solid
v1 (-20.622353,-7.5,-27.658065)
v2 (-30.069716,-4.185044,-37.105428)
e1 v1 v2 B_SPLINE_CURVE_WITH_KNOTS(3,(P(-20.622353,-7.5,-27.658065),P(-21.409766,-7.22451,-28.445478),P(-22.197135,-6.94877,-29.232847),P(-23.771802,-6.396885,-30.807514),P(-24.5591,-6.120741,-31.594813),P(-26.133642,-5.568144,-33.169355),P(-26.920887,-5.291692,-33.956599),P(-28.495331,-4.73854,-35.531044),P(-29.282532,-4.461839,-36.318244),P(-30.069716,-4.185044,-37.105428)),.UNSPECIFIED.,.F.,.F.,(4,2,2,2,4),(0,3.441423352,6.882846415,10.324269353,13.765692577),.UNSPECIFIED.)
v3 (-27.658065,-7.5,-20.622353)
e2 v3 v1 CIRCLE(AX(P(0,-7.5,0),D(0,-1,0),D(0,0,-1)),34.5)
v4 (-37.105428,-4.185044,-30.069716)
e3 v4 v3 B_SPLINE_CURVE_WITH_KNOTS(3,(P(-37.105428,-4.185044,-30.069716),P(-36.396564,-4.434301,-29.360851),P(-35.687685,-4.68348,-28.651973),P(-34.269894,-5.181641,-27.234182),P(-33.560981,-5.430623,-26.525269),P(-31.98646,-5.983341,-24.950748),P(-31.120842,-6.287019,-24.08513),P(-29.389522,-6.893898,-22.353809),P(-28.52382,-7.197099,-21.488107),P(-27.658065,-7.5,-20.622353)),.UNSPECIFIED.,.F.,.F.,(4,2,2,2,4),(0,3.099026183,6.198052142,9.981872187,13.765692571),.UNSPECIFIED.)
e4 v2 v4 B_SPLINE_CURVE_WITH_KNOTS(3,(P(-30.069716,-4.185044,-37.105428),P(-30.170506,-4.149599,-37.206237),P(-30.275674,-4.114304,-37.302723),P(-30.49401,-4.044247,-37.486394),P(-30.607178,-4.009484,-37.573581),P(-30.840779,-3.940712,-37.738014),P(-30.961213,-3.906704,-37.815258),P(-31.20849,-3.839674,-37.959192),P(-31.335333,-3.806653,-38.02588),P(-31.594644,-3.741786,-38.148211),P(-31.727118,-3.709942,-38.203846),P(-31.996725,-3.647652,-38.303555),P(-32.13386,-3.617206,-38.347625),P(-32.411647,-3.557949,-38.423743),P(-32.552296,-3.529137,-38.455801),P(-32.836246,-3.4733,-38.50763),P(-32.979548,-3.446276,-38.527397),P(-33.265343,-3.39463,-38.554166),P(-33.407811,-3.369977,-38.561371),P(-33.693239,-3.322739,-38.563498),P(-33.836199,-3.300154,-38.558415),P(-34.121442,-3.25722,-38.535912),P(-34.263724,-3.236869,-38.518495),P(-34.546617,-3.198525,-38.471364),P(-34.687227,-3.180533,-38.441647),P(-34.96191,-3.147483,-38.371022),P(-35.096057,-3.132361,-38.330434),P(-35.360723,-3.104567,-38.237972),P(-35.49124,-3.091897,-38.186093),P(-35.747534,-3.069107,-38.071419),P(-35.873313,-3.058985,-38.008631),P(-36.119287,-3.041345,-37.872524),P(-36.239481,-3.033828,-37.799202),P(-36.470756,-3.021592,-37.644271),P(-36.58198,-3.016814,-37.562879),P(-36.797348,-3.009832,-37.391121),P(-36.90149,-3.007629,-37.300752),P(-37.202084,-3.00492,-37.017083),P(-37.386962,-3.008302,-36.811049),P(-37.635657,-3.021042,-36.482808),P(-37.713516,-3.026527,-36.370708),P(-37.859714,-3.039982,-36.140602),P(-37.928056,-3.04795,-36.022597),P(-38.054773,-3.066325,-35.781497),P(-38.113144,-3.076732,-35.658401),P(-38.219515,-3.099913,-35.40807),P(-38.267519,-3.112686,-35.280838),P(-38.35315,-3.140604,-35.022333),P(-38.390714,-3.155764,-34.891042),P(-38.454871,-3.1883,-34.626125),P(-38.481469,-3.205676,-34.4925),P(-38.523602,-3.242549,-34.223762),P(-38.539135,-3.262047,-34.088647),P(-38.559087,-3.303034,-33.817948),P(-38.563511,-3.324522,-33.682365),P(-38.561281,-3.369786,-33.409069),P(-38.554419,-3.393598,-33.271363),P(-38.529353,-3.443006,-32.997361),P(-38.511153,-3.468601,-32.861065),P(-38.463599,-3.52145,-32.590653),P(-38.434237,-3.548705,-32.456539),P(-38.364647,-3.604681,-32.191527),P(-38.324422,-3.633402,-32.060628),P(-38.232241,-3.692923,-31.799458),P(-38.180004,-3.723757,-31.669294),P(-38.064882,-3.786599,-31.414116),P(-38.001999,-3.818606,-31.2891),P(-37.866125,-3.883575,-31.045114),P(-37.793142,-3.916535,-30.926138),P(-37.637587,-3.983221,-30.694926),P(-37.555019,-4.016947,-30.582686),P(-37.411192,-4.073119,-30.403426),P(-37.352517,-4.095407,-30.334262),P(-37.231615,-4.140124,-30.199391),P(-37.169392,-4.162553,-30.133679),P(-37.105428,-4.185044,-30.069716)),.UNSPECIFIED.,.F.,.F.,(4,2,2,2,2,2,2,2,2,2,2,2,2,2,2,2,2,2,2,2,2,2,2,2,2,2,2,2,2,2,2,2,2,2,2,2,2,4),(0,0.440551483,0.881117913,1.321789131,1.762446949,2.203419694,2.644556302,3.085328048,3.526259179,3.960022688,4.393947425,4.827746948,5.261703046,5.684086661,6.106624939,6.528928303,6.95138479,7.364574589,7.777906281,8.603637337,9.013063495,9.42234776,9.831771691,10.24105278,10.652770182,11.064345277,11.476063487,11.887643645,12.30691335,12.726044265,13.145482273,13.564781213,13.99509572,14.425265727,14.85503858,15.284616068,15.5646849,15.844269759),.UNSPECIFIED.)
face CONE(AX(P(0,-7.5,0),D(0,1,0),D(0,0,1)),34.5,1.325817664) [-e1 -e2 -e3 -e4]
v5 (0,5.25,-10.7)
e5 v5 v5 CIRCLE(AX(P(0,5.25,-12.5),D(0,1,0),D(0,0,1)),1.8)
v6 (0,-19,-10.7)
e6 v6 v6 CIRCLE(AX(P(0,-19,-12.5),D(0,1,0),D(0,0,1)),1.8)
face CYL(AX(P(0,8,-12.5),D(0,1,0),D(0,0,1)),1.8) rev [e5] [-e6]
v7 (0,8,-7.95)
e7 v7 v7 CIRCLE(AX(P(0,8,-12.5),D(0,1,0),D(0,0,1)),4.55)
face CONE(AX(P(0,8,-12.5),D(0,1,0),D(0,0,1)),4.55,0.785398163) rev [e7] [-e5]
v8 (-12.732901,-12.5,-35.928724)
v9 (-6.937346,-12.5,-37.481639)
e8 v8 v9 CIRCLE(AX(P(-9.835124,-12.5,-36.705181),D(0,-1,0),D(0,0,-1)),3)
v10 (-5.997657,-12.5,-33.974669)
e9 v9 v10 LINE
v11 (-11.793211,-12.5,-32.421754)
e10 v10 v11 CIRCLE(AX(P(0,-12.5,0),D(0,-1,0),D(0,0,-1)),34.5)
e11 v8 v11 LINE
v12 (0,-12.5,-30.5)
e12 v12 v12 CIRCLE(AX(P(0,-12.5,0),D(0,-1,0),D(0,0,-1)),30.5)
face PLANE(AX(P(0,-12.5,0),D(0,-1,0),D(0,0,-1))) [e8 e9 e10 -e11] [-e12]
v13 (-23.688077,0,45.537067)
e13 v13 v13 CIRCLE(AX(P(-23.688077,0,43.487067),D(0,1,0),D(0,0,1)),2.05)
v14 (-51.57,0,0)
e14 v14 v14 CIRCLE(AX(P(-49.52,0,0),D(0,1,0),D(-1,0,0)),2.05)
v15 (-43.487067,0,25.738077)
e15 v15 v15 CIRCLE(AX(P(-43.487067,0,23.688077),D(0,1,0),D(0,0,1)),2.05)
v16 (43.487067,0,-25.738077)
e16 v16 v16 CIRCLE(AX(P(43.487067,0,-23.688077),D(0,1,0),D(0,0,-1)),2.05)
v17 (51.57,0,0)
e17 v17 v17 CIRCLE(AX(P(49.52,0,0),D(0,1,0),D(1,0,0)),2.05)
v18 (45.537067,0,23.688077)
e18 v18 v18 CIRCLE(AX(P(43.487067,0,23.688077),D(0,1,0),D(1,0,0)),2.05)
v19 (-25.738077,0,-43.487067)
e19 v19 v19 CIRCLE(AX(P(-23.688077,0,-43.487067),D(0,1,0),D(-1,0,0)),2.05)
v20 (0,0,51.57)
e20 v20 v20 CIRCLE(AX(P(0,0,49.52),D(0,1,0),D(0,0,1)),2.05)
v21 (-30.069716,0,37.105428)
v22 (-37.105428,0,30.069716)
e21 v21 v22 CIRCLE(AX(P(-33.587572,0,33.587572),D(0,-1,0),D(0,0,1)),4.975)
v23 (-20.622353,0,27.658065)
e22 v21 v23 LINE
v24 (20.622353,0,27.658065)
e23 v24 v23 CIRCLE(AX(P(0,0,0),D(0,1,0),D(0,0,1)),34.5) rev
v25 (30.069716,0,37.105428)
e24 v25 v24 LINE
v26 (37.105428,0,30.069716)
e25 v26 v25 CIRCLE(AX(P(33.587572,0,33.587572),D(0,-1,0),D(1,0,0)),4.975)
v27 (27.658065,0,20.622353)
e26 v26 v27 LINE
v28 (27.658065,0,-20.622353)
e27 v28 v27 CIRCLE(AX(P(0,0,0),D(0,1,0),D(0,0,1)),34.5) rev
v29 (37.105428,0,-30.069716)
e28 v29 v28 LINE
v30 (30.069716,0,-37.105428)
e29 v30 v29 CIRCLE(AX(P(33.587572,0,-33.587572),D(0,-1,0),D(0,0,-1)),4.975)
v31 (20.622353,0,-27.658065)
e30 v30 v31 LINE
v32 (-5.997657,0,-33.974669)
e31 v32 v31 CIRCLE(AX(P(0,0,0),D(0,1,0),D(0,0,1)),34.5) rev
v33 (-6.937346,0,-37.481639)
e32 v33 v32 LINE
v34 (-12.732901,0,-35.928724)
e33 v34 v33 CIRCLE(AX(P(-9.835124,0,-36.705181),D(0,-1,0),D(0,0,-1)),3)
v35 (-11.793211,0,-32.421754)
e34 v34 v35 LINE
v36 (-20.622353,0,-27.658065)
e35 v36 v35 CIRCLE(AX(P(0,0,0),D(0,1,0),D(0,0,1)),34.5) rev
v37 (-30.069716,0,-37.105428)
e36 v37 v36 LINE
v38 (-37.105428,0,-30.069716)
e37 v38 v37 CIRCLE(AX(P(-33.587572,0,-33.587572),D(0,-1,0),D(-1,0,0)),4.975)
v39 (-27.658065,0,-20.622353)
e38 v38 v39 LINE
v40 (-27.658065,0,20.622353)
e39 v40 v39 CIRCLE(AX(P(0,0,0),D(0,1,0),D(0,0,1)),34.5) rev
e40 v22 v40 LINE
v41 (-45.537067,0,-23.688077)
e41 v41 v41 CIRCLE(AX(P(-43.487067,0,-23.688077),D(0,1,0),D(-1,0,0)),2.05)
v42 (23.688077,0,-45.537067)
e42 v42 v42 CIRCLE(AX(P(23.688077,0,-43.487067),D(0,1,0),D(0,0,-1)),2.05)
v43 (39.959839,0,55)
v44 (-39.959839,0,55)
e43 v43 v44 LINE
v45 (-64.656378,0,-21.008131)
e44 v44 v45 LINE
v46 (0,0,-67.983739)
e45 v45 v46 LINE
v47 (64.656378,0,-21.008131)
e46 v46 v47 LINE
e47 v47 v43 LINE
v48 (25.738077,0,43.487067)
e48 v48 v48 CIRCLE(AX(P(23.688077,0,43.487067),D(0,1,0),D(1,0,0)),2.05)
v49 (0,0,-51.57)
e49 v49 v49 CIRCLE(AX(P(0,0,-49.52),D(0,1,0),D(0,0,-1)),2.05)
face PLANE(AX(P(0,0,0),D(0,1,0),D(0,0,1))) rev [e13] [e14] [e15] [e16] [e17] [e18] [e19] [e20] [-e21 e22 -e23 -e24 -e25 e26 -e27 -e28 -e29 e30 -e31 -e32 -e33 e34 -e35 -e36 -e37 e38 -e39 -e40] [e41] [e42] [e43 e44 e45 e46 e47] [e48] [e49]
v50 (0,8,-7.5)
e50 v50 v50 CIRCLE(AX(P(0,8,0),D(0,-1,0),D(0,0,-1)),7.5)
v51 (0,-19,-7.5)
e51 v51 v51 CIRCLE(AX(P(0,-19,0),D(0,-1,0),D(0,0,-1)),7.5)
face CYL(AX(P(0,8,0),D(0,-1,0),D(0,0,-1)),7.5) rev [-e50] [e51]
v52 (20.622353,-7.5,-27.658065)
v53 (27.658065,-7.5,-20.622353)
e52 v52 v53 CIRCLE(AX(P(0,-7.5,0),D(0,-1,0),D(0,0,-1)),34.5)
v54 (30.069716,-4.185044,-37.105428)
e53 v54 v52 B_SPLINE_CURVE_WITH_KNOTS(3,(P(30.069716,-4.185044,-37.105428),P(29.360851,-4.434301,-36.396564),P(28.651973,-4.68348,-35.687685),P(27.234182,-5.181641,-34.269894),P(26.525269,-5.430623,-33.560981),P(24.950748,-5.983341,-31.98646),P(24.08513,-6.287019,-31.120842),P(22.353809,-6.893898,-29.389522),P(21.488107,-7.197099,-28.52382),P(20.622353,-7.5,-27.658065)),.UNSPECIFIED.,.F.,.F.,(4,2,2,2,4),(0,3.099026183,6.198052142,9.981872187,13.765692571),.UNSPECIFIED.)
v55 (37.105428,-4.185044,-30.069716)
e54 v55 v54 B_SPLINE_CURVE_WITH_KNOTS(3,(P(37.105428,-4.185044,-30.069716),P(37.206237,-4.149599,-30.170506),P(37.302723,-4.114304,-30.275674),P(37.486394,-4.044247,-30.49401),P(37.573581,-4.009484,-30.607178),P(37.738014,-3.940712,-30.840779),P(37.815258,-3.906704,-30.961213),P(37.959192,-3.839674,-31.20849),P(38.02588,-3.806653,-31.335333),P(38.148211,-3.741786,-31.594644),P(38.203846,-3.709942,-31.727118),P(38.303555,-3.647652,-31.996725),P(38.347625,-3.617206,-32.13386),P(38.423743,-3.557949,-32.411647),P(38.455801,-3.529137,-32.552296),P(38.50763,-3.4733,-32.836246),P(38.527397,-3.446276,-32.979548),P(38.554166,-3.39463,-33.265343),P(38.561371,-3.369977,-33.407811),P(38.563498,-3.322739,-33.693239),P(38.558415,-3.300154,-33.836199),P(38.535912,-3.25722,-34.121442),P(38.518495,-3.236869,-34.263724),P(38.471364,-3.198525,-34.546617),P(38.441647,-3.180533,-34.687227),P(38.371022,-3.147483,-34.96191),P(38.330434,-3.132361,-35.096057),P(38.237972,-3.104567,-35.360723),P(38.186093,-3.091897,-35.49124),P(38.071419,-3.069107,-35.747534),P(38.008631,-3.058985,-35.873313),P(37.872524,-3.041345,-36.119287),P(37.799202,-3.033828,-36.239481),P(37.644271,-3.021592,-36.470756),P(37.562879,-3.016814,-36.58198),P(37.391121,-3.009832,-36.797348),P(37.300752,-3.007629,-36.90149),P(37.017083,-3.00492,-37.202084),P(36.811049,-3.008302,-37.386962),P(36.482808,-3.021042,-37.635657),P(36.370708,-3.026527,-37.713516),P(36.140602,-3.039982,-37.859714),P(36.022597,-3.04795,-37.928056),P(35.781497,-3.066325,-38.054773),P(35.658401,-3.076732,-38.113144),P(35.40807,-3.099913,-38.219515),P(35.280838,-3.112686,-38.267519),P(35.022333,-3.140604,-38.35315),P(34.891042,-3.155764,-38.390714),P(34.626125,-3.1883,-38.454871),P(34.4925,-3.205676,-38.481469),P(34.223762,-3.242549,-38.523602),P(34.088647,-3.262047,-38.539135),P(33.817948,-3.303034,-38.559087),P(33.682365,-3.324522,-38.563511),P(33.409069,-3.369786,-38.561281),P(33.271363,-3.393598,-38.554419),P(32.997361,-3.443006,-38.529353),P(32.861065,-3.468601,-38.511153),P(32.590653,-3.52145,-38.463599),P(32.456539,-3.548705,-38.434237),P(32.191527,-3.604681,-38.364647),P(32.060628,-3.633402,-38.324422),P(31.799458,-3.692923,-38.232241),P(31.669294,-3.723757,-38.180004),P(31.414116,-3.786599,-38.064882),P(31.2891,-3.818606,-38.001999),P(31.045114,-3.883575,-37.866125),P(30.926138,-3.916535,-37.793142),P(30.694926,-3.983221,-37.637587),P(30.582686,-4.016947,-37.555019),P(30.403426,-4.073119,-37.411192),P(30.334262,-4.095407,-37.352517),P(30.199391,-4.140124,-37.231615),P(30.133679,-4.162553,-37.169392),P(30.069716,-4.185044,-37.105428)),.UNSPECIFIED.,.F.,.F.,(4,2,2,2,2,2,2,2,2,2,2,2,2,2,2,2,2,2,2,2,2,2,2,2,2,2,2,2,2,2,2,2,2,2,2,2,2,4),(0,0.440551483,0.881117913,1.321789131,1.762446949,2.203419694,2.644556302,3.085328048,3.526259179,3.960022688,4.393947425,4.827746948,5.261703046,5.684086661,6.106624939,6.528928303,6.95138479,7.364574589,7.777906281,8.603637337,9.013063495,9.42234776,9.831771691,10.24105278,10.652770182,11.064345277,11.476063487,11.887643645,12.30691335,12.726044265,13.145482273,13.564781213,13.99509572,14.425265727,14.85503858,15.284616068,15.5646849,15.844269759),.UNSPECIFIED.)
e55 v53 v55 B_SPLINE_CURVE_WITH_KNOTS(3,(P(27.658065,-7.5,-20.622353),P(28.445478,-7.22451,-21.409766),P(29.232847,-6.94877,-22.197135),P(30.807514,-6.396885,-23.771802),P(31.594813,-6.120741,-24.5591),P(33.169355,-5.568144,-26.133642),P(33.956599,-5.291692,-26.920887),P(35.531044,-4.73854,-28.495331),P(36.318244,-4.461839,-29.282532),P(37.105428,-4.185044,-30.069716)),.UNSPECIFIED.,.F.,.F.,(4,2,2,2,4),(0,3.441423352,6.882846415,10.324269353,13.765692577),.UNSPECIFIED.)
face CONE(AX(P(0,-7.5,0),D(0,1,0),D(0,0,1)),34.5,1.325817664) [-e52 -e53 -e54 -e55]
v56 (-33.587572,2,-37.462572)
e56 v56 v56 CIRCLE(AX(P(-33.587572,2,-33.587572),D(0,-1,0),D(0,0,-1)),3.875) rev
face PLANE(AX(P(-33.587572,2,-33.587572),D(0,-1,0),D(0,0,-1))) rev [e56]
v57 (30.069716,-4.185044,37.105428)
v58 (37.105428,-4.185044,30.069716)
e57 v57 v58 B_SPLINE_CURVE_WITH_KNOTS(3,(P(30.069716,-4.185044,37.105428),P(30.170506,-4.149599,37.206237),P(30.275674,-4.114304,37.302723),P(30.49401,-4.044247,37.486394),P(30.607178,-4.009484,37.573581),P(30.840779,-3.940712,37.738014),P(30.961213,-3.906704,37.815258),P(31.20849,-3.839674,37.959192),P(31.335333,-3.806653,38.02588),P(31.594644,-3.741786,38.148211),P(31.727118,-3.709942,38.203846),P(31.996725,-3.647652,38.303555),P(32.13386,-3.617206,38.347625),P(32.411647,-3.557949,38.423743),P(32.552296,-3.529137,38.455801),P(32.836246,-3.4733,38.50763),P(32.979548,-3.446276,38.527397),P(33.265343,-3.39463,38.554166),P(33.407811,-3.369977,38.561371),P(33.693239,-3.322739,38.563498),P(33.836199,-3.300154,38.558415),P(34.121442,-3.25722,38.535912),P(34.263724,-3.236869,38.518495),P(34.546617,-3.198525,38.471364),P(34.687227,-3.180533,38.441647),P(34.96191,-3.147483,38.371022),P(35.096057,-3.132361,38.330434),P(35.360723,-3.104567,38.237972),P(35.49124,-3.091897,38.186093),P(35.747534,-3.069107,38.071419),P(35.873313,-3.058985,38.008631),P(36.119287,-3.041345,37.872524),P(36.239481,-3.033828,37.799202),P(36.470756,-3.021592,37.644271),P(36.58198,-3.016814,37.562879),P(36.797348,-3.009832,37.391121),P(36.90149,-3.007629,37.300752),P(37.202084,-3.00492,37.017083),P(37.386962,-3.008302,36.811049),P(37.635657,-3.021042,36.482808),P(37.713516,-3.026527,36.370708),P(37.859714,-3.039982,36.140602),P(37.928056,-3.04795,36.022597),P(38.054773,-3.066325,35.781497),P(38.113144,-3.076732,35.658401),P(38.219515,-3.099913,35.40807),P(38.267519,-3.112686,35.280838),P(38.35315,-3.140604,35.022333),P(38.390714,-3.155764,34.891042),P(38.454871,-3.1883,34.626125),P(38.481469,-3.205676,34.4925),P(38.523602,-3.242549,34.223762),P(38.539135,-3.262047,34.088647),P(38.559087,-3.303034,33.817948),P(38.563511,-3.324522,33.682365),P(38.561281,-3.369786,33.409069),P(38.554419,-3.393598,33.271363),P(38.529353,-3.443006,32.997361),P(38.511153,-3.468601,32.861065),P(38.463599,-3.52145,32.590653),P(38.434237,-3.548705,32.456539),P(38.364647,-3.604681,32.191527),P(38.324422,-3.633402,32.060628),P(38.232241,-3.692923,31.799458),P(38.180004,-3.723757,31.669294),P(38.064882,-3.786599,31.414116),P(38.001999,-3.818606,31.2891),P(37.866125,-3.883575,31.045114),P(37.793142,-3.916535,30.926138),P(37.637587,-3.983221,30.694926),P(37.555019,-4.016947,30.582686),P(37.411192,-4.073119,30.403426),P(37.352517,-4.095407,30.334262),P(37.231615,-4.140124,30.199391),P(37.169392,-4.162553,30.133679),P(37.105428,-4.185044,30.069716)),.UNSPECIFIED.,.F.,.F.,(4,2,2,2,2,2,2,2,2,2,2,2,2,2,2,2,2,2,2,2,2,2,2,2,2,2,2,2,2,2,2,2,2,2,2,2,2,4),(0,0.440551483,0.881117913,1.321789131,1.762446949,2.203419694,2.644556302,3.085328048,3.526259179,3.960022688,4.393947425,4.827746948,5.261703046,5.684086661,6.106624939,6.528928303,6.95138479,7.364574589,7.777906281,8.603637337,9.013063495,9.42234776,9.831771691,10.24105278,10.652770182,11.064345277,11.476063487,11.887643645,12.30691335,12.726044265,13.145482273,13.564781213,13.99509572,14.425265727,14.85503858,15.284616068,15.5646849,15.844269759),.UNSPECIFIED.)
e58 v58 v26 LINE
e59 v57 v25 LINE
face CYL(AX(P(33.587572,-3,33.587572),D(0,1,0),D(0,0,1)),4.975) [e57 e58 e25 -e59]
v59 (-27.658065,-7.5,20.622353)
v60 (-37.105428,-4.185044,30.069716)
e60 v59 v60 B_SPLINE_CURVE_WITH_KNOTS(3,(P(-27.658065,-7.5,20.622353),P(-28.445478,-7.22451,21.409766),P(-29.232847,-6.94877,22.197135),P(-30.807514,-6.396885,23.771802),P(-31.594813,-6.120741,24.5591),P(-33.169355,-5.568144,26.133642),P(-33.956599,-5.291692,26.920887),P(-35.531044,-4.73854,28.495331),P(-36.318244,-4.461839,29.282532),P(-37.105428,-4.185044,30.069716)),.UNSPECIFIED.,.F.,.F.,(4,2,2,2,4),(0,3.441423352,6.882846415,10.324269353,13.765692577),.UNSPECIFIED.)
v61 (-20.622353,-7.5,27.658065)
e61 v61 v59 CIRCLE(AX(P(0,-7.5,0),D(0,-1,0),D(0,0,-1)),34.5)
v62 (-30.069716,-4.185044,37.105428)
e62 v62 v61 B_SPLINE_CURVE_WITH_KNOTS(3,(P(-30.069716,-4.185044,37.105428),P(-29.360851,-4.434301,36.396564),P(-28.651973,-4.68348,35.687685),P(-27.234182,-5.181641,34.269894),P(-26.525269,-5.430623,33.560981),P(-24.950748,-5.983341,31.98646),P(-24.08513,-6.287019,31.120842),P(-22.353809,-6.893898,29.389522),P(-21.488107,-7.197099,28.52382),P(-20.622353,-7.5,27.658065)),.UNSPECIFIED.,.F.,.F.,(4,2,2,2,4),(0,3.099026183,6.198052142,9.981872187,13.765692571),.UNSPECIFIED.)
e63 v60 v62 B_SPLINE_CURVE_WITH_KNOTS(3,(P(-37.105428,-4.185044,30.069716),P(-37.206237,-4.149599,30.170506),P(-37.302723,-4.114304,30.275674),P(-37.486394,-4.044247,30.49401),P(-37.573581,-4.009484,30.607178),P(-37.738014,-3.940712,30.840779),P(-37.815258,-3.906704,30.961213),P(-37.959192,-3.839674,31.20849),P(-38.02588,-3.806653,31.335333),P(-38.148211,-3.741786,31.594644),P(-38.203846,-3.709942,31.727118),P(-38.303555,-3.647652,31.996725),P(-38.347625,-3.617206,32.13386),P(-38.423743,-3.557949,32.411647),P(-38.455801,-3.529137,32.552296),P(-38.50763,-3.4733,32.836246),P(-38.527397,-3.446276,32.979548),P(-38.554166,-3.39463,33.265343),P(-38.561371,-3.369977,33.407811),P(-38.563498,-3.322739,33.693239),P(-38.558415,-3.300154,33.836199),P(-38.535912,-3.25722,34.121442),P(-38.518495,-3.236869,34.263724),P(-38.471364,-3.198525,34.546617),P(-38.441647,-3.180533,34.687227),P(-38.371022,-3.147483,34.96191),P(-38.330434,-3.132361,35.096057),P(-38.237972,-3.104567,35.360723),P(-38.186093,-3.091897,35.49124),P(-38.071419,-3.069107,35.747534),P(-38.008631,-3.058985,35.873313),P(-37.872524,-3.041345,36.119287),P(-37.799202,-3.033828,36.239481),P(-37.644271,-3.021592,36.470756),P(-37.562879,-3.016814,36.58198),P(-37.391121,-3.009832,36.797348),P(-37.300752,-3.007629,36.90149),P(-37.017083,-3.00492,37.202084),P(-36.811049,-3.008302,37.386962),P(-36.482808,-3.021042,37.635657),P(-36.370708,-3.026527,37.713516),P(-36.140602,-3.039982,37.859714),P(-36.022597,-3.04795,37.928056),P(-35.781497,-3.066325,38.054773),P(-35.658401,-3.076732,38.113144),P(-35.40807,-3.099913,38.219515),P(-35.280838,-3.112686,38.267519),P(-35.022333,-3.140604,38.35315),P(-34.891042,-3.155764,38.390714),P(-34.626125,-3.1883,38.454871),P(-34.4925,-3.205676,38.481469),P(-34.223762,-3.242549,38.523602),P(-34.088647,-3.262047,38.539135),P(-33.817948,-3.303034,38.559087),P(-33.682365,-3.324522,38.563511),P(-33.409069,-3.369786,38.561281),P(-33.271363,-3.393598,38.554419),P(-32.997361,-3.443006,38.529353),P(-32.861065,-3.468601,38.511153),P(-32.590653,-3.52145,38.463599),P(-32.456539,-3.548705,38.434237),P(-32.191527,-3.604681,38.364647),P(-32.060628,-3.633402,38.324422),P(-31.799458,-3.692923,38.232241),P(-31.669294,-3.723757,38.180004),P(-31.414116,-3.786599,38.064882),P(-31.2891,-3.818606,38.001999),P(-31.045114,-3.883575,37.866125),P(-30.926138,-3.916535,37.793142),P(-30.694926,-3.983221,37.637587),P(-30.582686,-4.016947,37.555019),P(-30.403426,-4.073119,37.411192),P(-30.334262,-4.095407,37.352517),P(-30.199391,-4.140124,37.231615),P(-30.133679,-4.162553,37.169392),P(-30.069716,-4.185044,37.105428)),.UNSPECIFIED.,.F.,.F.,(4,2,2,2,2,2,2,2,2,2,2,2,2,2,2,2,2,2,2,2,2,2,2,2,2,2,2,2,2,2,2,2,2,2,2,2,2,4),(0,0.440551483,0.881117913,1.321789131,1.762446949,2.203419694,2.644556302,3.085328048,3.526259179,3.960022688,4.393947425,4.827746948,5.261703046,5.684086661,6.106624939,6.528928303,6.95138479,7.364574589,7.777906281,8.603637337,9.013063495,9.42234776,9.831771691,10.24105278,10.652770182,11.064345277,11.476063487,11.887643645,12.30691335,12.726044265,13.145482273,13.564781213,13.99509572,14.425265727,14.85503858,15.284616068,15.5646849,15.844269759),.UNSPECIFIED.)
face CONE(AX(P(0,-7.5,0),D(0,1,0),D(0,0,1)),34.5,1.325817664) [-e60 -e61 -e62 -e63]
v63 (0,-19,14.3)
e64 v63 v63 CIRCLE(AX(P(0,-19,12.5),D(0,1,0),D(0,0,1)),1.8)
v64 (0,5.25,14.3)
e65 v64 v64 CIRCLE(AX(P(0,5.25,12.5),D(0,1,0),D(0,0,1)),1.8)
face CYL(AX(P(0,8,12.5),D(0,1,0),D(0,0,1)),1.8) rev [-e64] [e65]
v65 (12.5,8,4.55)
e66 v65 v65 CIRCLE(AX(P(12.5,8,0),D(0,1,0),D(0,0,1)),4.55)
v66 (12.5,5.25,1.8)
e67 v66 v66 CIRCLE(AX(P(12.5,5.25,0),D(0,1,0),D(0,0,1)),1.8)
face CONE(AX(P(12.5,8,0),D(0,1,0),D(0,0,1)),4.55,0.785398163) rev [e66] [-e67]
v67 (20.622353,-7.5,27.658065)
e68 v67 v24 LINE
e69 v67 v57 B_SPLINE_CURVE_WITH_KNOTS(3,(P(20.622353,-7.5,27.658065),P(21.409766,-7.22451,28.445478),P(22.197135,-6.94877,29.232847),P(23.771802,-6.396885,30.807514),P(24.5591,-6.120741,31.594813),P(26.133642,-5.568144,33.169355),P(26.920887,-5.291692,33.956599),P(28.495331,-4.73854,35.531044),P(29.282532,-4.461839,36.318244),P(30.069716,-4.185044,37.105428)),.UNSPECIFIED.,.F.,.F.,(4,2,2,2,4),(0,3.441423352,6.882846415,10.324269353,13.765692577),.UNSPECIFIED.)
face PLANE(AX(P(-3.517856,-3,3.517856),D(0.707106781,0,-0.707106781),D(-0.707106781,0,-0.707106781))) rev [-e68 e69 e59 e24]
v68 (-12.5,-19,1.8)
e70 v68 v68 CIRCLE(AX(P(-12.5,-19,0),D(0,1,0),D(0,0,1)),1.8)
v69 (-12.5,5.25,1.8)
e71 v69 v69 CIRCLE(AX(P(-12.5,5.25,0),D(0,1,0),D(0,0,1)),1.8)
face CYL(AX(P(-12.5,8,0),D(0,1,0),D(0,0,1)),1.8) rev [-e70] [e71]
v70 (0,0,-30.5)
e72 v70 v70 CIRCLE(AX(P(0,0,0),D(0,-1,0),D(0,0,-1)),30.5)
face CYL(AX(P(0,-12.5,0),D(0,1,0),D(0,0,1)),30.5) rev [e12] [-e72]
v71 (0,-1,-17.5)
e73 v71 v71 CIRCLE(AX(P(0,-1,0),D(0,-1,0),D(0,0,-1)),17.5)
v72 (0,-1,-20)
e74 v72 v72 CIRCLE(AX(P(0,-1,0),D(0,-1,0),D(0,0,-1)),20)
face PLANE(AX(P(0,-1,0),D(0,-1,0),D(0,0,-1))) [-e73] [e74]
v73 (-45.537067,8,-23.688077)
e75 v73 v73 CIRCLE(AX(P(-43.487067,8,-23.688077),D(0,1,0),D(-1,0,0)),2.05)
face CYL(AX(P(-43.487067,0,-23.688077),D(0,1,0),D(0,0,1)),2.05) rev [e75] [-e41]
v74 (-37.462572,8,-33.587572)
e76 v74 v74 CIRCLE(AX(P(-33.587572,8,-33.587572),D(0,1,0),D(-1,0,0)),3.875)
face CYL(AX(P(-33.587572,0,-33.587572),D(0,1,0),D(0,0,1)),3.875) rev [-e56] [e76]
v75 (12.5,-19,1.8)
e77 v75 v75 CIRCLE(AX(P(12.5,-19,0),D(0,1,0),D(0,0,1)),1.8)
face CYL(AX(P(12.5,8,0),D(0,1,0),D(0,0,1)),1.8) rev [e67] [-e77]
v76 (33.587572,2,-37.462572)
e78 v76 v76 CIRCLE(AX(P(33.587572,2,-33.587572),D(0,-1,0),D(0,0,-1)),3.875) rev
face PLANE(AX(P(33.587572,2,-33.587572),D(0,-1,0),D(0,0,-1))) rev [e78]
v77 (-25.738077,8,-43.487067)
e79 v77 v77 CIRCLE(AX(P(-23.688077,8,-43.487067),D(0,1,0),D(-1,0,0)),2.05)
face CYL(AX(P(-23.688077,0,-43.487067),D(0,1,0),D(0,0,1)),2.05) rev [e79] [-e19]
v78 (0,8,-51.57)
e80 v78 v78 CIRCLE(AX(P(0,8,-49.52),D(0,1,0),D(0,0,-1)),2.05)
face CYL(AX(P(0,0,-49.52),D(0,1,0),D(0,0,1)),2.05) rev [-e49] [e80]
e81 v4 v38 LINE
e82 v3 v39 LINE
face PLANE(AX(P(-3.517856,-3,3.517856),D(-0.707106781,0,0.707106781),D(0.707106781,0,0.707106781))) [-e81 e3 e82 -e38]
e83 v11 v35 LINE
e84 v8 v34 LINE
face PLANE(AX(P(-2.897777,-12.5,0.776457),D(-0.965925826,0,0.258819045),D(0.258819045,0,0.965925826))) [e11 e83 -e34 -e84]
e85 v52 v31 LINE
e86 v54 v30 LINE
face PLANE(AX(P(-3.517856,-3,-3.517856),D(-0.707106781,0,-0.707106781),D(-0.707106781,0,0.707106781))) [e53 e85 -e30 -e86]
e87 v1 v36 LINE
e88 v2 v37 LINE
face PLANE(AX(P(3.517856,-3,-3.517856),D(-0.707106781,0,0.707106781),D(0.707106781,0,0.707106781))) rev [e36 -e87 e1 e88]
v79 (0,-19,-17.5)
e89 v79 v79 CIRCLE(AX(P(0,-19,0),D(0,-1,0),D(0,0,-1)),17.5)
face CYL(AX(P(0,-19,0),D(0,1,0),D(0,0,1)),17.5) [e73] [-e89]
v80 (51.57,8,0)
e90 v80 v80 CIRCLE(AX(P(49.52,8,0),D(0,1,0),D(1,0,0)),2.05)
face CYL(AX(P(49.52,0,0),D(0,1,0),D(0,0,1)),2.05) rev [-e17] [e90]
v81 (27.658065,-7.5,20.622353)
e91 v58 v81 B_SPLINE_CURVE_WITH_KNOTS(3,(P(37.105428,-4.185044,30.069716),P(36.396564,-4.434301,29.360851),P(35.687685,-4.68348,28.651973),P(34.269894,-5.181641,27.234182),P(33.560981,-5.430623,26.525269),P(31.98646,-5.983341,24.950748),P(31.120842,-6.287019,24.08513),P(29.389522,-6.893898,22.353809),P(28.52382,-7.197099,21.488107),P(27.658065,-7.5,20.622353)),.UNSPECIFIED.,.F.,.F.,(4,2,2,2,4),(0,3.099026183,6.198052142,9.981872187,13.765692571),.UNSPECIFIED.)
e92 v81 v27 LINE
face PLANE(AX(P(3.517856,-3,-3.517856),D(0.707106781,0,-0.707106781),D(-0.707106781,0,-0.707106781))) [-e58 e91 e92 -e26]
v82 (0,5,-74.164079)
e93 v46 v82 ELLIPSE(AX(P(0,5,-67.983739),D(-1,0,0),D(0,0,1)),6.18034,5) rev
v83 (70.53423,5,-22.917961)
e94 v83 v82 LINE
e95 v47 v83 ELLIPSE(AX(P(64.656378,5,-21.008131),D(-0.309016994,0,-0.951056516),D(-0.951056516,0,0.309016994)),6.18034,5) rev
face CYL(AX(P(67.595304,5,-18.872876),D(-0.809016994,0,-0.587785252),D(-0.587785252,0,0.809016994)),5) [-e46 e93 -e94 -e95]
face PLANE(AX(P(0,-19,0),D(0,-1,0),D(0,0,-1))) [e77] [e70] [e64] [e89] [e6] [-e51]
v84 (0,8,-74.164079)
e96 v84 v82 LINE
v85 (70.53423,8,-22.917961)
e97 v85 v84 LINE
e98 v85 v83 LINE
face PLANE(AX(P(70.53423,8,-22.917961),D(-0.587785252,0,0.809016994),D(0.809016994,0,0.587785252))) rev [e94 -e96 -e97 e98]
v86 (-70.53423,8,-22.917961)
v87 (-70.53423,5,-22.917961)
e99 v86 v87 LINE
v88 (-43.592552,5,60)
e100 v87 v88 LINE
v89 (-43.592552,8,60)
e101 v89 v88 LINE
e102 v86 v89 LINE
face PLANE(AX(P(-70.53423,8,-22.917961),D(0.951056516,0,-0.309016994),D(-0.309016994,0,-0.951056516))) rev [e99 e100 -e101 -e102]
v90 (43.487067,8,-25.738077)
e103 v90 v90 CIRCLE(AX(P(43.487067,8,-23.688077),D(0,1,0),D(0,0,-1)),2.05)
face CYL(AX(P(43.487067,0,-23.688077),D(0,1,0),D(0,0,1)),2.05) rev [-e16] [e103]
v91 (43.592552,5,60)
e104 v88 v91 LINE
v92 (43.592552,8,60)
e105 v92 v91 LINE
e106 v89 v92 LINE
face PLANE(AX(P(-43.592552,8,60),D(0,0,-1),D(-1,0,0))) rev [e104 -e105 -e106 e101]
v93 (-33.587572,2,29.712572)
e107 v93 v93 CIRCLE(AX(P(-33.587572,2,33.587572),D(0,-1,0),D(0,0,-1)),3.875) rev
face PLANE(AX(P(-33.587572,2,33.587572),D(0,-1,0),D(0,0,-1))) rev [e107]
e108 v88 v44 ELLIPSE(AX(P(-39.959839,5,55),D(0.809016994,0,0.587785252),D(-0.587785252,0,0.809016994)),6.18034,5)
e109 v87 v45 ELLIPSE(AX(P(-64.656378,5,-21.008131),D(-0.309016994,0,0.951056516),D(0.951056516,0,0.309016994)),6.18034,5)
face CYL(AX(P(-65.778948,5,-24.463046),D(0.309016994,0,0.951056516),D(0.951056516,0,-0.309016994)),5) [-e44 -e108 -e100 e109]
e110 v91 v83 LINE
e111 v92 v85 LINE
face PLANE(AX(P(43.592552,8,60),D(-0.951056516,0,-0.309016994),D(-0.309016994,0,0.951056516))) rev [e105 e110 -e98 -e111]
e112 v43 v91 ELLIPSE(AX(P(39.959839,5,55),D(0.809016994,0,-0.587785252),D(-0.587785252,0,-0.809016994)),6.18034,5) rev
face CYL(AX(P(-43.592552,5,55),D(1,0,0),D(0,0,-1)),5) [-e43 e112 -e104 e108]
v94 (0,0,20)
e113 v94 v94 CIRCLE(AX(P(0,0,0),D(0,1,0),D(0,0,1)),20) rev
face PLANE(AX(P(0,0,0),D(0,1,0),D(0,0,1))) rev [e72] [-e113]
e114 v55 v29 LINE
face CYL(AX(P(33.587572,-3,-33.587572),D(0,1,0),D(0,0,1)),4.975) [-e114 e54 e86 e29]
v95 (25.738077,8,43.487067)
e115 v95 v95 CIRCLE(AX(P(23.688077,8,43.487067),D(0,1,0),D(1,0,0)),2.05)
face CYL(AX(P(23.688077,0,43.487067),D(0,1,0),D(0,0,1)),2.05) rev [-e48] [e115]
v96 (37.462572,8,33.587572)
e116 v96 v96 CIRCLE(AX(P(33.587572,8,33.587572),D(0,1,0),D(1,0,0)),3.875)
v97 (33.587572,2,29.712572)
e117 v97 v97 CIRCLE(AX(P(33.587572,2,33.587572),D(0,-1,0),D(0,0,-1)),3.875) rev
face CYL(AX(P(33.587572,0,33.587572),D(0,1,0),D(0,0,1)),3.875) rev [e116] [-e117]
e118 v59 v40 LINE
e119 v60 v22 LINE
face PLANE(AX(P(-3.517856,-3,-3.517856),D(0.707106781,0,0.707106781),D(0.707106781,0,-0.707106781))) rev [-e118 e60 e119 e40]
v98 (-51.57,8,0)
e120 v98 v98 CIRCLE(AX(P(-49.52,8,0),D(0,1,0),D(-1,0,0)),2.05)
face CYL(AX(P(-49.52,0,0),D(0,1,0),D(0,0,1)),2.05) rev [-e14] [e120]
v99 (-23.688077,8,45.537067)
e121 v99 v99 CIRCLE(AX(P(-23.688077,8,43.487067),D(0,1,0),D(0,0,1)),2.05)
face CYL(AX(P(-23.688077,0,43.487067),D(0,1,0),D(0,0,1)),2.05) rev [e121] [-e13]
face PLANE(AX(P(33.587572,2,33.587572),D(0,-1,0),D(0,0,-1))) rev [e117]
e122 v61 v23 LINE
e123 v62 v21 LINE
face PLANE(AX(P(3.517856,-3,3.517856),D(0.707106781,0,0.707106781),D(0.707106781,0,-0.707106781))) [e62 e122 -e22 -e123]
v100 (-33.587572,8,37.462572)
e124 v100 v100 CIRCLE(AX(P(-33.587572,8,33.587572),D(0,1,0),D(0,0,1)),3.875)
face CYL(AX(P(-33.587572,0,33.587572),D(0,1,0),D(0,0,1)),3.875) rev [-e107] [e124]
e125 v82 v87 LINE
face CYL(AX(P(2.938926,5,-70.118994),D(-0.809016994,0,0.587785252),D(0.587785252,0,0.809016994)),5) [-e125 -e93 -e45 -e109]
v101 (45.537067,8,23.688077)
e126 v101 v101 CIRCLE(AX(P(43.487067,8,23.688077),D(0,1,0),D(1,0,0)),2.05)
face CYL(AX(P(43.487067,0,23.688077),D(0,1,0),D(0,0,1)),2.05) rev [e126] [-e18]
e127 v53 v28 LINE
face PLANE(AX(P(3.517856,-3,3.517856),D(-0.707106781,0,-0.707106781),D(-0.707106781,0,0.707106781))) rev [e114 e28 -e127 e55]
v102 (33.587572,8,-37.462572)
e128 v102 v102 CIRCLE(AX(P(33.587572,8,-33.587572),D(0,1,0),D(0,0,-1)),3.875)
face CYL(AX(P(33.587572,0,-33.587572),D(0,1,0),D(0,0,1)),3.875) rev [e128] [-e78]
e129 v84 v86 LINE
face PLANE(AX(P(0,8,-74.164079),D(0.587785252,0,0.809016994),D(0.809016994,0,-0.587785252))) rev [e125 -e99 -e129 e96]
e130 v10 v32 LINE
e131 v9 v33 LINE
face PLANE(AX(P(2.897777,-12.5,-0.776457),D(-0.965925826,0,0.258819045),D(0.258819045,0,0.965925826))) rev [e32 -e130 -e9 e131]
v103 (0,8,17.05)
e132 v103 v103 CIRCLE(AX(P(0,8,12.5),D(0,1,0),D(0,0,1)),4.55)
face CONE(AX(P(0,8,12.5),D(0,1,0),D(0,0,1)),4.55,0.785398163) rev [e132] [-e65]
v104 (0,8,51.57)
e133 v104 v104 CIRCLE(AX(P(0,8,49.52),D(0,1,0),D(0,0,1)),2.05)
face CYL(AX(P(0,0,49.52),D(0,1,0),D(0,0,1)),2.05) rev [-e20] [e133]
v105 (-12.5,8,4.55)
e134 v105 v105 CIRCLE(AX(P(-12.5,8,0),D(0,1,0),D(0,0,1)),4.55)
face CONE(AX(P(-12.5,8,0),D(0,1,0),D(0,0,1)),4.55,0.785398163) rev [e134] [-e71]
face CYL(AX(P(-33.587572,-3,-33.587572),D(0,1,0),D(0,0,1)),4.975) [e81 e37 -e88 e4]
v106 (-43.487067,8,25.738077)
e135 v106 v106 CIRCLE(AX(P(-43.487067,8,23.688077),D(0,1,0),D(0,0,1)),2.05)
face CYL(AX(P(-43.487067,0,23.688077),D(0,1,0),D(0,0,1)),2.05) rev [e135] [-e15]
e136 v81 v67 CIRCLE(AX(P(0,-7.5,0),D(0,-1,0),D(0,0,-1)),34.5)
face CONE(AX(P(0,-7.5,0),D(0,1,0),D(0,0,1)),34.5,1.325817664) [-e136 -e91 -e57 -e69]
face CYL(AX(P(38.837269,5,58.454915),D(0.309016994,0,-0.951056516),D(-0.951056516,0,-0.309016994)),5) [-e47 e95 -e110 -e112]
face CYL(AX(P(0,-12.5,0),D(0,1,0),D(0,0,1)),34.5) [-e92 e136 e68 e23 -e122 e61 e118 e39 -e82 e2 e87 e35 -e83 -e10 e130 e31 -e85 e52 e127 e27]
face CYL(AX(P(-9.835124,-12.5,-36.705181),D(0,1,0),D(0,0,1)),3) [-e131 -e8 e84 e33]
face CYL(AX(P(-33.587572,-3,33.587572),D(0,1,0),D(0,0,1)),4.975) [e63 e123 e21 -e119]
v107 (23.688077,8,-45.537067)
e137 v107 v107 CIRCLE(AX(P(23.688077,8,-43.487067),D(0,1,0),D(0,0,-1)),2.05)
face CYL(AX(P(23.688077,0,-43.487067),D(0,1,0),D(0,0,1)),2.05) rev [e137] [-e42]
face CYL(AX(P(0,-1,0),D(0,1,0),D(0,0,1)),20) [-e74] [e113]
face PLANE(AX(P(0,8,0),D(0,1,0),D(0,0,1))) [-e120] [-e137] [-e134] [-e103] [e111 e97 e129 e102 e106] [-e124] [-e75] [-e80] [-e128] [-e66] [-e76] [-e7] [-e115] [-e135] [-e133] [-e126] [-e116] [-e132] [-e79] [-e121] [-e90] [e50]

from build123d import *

# Parameters (mm, degrees)
BOSS_EXTRUDE1_DEPTH                                 = 8
SKETCH2_R                                           = 3.875
SKETCH2_R_2                                         = 2.05
CUT_EXTRUDE1_DEPTH                                  = 103.661522502
CIRPATTERN1_COUNT                                   = 4
SKETCH4_R                                           = 34.5
SKETCH4_R_2                                         = 30.5
BOSS_EXTRUDE2_DEPTH                                 = 12.5
SKETCH5_R                                           = 20
BOSS_EXTRUDE3_DEPTH                                 = 1
SKETCH6_R                                           = 17.5
BOSS_EXTRUDE4_DEPTH                                 = 18
SKETCH7_R                                           = 7.5
CUT_EXTRUDE2_DEPTH                                  = 106.85078272
SKETCH9_R                                           = 3.975
BOSS_EXTRUDE6_DEPTH                                 = 2
SKETCH10_R                                          = 4.975
BOSS_EXTRUDE7_DEPTH                                 = 3
CHAMFER2_START                                      = -3.006253442
CHAMFER2_DEPTH                                      = 0.006253442
CHAMFER2_START_2                                    = -7.5000001
CHAMFER2_2_DEPTH                                    = 4.493746658
CHAMFER2_3_ANGLE                                    = 16.582247
CIRPATTERN2_COUNT                                   = 4
CSK_FOR_M4_COUNTERSUNK_FLAT_HEAD_SCREW1_D           = 3.6
CSK_FOR_M4_COUNTERSUNK_FLAT_HEAD_SCREW1_CSINK_D     = 9.1
CSK_FOR_M4_COUNTERSUNK_FLAT_HEAD_SCREW1_CSINK_ANGLE = 90
BOSS_EXTRUDE8_DEPTH                                 = 12.5
FILLET1_R                                           = 5


with BuildPart() as part:
    # Sketch1 → Boss-Extrude1 (new body)
    with BuildSketch(Plane(origin=(0, 0, 0), x_dir=(1, 0, 0), z_dir=(0, 1, 0))):
        Polygon((0, 74.16407865), (-70.534230275, 22.917960675), (-43.59255168, -60), (43.59255168, -60), (70.534230275, 22.917960675), align=None)
    extrude(amount=BOSS_EXTRUDE1_DEPTH)

    # Sketch2 → Cut-Extrude1 (cut, through all)
    with BuildSketch(Plane(origin=(0, 8, 0), x_dir=(1, 0, 0), z_dir=(0, 1, 0))):
        with Locations(Location((-33.587572106, -33.587572106, 0), (0, 0, 270))):
            Circle(SKETCH2_R)
        with Locations(Location((-43.487067043, -23.68807717, 0), (0, 0, 270))):
            Circle(SKETCH2_R_2)
        with Locations(Location((-23.68807717, -43.487067043, 0), (0, 0, 270))):
            Circle(SKETCH2_R_2)
        with Locations(Location((0, -49.52, 0), (0, 0, 270))):
            Circle(SKETCH2_R_2)
    cut_extrude1 = extrude(amount=-CUT_EXTRUDE1_DEPTH, mode=Mode.SUBTRACT)

    # CirPattern1: Cut-Extrude1 ×4 about axis
    cirpattern1_axis = Axis((0, 0, 0), (0, 1, 0))
    for i in range(1, CIRPATTERN1_COUNT):
        add(cut_extrude1.rotate(cirpattern1_axis, i * 360 / CIRPATTERN1_COUNT), mode=Mode.SUBTRACT)

    # Sketch4 → Boss-Extrude2 (add)
    with BuildSketch(Plane.XZ):
        with Locations(Location((0, 0, 0), (0, 0, 90))):
            Circle(SKETCH4_R)
        with Locations(Location((0, 0, 0), (0, 0, 270))):
            Circle(SKETCH4_R_2, mode=Mode.SUBTRACT)
    extrude(amount=BOSS_EXTRUDE2_DEPTH)

    # Sketch5 → Boss-Extrude3 (add)
    with BuildSketch(Plane.XZ):
        with Locations(Location((0, 0, 0), (0, 0, 90))):
            Circle(SKETCH5_R)
    extrude(amount=BOSS_EXTRUDE3_DEPTH)

    # Sketch6 → Boss-Extrude4 (add)
    with BuildSketch(Plane.XZ.offset(1)):
        with Locations(Location((0, 0, 0), (0, 0, 270))):
            Circle(SKETCH6_R)
    extrude(amount=BOSS_EXTRUDE4_DEPTH)

    # Sketch7 → Cut-Extrude2 (cut, through all)
    with BuildSketch(Plane.XZ.offset(19)):
        with Locations(Location((0, 0, 0), (0, 0, 270))):
            Circle(SKETCH7_R)
    extrude(amount=-CUT_EXTRUDE2_DEPTH, mode=Mode.SUBTRACT)

    # Sketch9 → Boss-Extrude6 (add)
    with BuildSketch(Plane.XZ):
        with Locations((33.587572106, -33.587572106)):
            Circle(SKETCH9_R)
        with Locations((-33.587572106, -33.587572106)):
            Circle(SKETCH9_R)
        with Locations((-33.587572106, 33.587572106)):
            Circle(SKETCH9_R)
        with Locations((33.587572106, 33.587572106)):
            Circle(SKETCH9_R)
    extrude(amount=-BOSS_EXTRUDE6_DEPTH)

    # Sketch10 → Boss-Extrude7 (add)
    with BuildSketch(Plane.XZ):
        with BuildLine():
            Line((20.6223527, -27.658065173), (30.06971587, -37.105428343))
            ThreePointArc((30.06971587, -37.105428343), (30.06971587, -30.06971587), (37.105428343, -30.06971587))
            Line((37.105428343, -30.06971587), (27.658065173, -20.6223527))
            ThreePointArc((27.658065173, -20.6223527), (24.395183951, -24.395183951), (20.6223527, -27.658065173))
        make_face()
        with Locations((33.587572106, -33.587572106)):
            Circle(SKETCH10_R)
    boss_extrude7 = extrude(amount=BOSS_EXTRUDE7_DEPTH)

    # Chamfer2: read off the stored shape, not the designer's step
    # Chamfer2 outline → Chamfer2 (add)
    with BuildSketch(Plane(origin=(0, 0, 0), x_dir=(1, 0, 0), z_dir=(0, 1, 0)).offset(CHAMFER2_START)):
        with BuildLine():
            ThreePointArc((37.105428343, 30.06971587), (37.105428343, 37.105428343), (30.06971587, 37.105428343))
            Line((30.06971587, 37.105428343), (20.6223527, 27.658065173))
            ThreePointArc((20.6223527, 27.658065173), (24.395183951, 24.395183951), (27.658065173, 20.6223527))
            Line((27.658065173, 20.6223527), (37.105428343, 30.06971587))
        make_face()
    chamfer2 = extrude(amount=CHAMFER2_DEPTH)

    # Chamfer2 2 outline → Chamfer2 2 (add)
    with BuildSketch(Plane(origin=(0, 0, 0), x_dir=(1, 0, 0), z_dir=(0, 1, 0)).offset(CHAMFER2_START_2)):
        with BuildLine():
            ThreePointArc((37.105428343, 30.06971587), (37.105428343, 37.105428343), (30.06971587, 37.105428343))
            Line((30.06971587, 37.105428343), (20.6223527, 27.658065173))
            ThreePointArc((20.6223527, 27.658065173), (24.395183951, 24.395183951), (27.658065173, 20.6223527))
            Line((27.658065173, 20.6223527), (37.105428343, 30.06971587))
        make_face()
    chamfer2_2 = extrude(amount=CHAMFER2_2_DEPTH)

    # Chamfer2 3 outline → Chamfer2 3 (revolve, cut)
    with BuildSketch(Plane(origin=(0, 0, 0), x_dir=(0.801683048491221, 0, -0.597749353627273), z_dir=(0.597749353627273, 0, 0.801683048491221))):
        Polygon((52.475017897, -3.006245526), (34.5, -7.5), (52.475, -7.5000001), align=None)
    chamfer2_3 = revolve(axis=Axis((0, 0, 0), (0, 1, 0)), revolution_arc=CHAMFER2_3_ANGLE, mode=Mode.SUBTRACT)

    # CirPattern2: Boss-Extrude7, Chamfer2, Chamfer2 2, Chamfer2 3 ×4 about axis
    cirpattern2_axis = Axis((0, 0, 0), (0, 1, 0))
    add([boss_extrude7.rotate(cirpattern2_axis, i * 360 / CIRPATTERN2_COUNT) for i in range(1, CIRPATTERN2_COUNT)])
    add([chamfer2.rotate(cirpattern2_axis, i * 360 / CIRPATTERN2_COUNT) for i in range(1, CIRPATTERN2_COUNT)])
    add([chamfer2_2.rotate(cirpattern2_axis, i * 360 / CIRPATTERN2_COUNT) for i in range(1, CIRPATTERN2_COUNT)])
    add([chamfer2_3.rotate(cirpattern2_axis, i * 360 / CIRPATTERN2_COUNT) for i in range(1, CIRPATTERN2_COUNT)], mode=Mode.SUBTRACT)

    # CSK for M4 Countersunk Flat Head Screw1 (through all)
    with Locations(Plane(origin=(0, 8, -12.5), x_dir=(0, 0, 1), z_dir=(0, 1, 0))):
        with Locations((0, 0), (12.5, 12.5), (25, 0), (12.5, -12.5)):
            CounterSinkHole(CSK_FOR_M4_COUNTERSUNK_FLAT_HEAD_SCREW1_D / 2, CSK_FOR_M4_COUNTERSUNK_FLAT_HEAD_SCREW1_CSINK_D / 2, counter_sink_angle=CSK_FOR_M4_COUNTERSUNK_FLAT_HEAD_SCREW1_CSINK_ANGLE)

    # Sketch13 → Boss-Extrude8 (add)
    with BuildSketch(Plane.XZ):
        with BuildLine():
            Line((-11.79321147, -32.421754475), (-12.732901193, -35.928724264))
            ThreePointArc((-12.732901193, -35.928724264), (-10.611580849, -39.602958878), (-6.937346235, -37.481638534))
            Line((-6.937346235, -37.481638534), (-5.997656512, -33.974668745))
            ThreePointArc((-5.997656512, -33.974668745), (-8.929257056, -33.324441007), (-11.79321147, -32.421754475))
        make_face()
    extrude(amount=BOSS_EXTRUDE8_DEPTH)

    # Fillet1
    fillet1_edges = [part.edges().sort_by_distance(p)[0] for p in [
        (57.063390978, 0, 18.541019662),
        (0, 0, 60),
        (-57.063390978, 0, 18.541019662),
        (-35.267115138, 0, -48.541019662),
        (35.267115138, 0, -48.541019662),
    ]]
    fillet(fillet1_edges, radius=FILLET1_R)


solid = part.part
